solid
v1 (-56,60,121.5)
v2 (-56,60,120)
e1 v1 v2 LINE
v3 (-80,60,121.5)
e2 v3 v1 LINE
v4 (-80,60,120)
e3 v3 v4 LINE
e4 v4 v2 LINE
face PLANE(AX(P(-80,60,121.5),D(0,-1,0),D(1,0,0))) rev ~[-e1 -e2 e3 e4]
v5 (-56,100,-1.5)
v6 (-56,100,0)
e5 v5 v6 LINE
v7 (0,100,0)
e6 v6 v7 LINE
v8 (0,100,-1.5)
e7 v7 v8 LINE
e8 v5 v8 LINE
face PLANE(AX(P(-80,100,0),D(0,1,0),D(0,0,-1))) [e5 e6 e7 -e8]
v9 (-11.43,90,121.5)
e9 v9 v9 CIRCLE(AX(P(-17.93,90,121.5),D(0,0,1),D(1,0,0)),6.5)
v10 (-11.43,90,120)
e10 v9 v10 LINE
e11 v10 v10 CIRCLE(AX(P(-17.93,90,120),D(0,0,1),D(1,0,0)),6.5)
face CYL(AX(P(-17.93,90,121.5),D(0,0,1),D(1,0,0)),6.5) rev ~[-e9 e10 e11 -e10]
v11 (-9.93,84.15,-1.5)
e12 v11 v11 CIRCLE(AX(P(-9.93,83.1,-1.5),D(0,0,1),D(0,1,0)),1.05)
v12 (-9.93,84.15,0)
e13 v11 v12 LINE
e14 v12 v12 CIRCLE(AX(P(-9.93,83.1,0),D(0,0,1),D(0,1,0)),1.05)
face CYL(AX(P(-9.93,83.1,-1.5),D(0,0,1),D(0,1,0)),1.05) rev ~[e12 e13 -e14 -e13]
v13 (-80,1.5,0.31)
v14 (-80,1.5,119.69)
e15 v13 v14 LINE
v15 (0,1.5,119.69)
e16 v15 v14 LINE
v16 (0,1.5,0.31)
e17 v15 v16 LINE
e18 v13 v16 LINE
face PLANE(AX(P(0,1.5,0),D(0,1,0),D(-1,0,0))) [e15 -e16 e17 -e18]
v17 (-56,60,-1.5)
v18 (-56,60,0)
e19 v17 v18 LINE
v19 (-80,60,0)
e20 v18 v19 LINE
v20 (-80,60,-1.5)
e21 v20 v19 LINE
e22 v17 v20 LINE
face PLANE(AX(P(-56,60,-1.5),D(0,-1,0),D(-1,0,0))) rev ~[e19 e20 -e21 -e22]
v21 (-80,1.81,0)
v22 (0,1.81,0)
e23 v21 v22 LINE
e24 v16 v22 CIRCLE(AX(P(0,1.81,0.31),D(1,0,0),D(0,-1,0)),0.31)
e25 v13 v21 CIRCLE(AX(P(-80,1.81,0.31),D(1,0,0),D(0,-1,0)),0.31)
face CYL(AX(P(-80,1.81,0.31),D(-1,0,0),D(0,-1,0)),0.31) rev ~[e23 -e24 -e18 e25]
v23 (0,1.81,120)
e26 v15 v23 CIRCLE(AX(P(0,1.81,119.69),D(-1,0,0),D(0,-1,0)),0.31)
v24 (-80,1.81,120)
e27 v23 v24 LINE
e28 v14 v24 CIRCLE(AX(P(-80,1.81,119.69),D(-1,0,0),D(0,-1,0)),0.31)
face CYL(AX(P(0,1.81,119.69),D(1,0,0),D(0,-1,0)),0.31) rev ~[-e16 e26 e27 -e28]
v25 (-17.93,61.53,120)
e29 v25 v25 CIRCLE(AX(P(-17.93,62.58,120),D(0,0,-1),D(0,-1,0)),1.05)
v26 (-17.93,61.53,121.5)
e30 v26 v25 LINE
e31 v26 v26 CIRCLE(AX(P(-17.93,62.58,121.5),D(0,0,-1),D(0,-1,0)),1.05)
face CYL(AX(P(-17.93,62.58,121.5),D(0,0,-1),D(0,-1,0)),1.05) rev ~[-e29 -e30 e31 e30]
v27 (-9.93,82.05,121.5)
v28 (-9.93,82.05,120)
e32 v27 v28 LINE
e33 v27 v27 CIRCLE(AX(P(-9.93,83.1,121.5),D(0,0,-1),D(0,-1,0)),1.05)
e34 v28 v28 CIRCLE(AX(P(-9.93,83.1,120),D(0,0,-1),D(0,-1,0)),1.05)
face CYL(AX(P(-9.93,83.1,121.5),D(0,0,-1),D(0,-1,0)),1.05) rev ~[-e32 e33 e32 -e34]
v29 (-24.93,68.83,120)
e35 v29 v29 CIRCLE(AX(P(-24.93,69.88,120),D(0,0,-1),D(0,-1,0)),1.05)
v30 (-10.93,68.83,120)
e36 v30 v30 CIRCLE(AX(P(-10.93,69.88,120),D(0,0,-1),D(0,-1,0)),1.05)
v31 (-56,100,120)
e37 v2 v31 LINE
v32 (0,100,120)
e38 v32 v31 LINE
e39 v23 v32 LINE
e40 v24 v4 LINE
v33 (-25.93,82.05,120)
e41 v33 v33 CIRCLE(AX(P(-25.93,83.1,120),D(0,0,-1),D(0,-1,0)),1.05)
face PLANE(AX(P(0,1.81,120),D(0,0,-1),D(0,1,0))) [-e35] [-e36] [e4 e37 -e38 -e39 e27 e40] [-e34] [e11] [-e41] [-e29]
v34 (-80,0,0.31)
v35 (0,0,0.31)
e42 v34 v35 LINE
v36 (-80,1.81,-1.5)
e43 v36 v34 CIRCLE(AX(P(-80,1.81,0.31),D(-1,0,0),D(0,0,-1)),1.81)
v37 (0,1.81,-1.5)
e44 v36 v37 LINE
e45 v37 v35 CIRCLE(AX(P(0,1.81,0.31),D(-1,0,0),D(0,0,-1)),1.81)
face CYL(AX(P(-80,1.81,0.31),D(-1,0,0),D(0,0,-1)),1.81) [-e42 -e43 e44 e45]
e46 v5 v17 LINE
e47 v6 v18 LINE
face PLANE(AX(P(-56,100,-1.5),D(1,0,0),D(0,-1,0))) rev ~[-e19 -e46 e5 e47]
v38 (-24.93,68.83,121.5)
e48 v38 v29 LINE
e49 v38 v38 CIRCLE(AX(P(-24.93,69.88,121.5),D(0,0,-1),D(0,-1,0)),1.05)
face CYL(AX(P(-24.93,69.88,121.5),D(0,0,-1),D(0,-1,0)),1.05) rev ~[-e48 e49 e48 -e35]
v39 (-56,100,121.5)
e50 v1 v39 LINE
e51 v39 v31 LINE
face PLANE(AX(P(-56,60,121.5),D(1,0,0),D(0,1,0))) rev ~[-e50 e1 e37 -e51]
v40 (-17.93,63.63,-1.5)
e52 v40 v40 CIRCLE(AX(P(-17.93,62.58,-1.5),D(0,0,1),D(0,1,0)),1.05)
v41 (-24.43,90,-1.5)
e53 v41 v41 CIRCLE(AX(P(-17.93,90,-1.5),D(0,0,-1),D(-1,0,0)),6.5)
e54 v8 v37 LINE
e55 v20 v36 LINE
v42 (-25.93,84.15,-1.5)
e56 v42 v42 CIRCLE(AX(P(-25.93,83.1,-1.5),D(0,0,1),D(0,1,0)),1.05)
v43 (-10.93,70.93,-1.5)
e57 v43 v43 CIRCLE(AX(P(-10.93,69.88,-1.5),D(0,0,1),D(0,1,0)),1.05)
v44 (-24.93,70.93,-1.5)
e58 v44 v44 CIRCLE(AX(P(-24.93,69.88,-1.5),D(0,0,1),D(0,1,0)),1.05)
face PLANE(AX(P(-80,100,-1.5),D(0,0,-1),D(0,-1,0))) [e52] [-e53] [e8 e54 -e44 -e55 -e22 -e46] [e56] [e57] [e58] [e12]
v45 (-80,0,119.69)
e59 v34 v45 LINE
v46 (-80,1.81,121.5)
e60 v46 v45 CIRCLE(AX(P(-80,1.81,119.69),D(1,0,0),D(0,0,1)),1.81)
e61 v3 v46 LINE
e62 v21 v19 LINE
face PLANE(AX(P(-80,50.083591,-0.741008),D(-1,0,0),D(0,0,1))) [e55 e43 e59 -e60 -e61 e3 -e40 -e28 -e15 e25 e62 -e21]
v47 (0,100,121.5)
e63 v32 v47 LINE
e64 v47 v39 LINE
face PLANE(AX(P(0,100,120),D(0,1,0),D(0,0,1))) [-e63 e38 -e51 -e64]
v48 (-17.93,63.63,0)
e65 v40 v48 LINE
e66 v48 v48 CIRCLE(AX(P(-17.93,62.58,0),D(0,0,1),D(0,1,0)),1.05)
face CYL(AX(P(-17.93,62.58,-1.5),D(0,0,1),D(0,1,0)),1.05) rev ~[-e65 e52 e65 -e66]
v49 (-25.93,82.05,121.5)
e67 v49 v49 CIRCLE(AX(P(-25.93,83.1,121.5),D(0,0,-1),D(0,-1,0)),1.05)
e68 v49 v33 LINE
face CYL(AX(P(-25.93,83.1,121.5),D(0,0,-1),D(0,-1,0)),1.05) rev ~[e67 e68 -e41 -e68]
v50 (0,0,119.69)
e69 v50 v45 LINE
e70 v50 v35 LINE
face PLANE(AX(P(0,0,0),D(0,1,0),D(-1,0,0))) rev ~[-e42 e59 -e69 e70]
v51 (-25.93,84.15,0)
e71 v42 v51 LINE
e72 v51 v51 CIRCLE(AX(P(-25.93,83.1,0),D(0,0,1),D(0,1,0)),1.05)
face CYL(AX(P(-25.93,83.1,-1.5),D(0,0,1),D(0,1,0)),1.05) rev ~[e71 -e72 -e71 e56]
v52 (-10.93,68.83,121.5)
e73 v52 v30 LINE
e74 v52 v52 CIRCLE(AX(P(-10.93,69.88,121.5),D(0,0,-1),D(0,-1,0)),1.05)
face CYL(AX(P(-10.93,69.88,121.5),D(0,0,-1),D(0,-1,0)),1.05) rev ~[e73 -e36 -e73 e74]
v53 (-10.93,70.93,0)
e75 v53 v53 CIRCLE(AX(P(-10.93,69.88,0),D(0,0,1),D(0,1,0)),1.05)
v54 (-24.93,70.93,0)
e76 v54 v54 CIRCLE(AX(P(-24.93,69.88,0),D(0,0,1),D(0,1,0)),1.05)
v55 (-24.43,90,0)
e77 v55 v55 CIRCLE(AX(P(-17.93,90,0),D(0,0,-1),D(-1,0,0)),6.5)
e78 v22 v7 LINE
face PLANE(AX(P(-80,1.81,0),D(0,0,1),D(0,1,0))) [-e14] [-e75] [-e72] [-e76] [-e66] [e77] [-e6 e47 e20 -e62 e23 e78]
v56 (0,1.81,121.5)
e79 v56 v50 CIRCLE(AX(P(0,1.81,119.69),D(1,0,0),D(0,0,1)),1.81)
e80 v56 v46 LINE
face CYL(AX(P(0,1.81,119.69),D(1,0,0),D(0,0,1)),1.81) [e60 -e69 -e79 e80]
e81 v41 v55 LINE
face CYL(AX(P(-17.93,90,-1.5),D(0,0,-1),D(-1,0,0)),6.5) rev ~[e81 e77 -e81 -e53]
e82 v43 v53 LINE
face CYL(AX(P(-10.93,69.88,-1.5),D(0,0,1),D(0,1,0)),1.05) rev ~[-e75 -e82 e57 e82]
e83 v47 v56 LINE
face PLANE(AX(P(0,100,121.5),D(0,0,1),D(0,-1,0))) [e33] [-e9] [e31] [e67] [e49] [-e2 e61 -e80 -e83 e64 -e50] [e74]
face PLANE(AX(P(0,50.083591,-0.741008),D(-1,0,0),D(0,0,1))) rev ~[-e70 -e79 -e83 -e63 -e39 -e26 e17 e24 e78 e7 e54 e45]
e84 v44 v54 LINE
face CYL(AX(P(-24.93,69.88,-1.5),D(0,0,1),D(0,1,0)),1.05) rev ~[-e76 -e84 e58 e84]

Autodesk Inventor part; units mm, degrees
ref_plane "YZ Plane" through (0, 0, 0) normal (1, 0, 0) x (0, 1, 0)
ref_plane "XZ Plane" through (0, 0, 0) normal (0, 1, 0) x (-1, 0, 0)
ref_plane "XY Plane" through (0, 0, 0) normal (0, 0, 1) x (1, 0, 0)
sketch "Sketch1" plane through (0, 0, 0) normal (0, 1, 0) x (-1, 0, 0)
  line L0 (0, 0) -> (80, 0)
  line L1 (80, 0) -> (80, 120)
  line L2 (80, 120) -> (0, 120)
  line L3 (0, 120) -> (0, 0)
  dimension "d0" = 80
  dimension "d1" = 120
extrude "Plate1" add sketch "Sketch1" along normal blind 1.5
sketch "Sketch2" plane through (0, 0, 121.5) normal (0, 0, -1) x (-1, 0, 0)
  line L0 (80, 0) -> (0, 0)
  line L1 (0, 0) -> (0, 100)
  line L2 (0, 100) -> (80, 100)
  line L3 (80, 100) -> (80, 0)
edge flange "Flange1" height 100 angle 90 thickness 1.5 bend radius 0.31 thickness toward (0, 0, -1) relief tear relief width 1.5 relief depth 0.75 edges at (-40, 1.5, 120) wall of the first edge with corners at (-80, 0, 121.5) (0, 0, 121.5) (0, 100, 121.5) (-80, 100, 121.5)
bend "Bend1"
corner "Corner1"
sketch "Sketch3" plane through (-80, 0, -1.5) normal (0, 0, 1) x (1, 0, 0)
  line L0 (80, 0) -> (0, 0)
  line L1 (0, 0) -> (0, 100)
  line L2 (0, 100) -> (80, 100)
  line L3 (80, 100) -> (80, 0)
edge flange "Flange2" height 100 angle 90 thickness 1.5 bend radius 0.31 thickness toward (0, 0, 1) relief tear relief width 1.5 relief depth 0.75 edges at (-40, 1.5, 0) wall of the first edge with corners at (0, 0, -1.5) (-80, 0, -1.5) (-80, 100, -1.5) (0, 100, -1.5)
bend "Bend2"
corner "Corner2"
sketch "Sketch4" plane through (0, 100, -1.5) normal (0, 0, -1) x (-1, 0, 0)
  line L0 (56, -40) -> (80, -40)
  line L1 (80, -40) -> (80, 0)
  line L2 (80, 0) -> (56, 0)
  line L3 (56, 0) -> (56, -40)
  line L4 (80, 0) -> (80, -98.19) projected
  line L5 (0, 0) -> (80, 0) projected
  point P0 (0, -100)
  dimension "d23" = 24
  dimension "d24" = 40
extrude "Cut1" cut sketch "Sketch4" against normal blind 1.5
sketch "Sketch5" plane through (0, 100, 120) normal (0, 0, -1) x (-1, 0, 0)
  point P0 (0, -100)
sketch "Sketch6" plane through (-80, 100, 121.5) normal (0, 0, 1) x (1, 0, 0)
  line L0 (24, 0) -> (0, 0)
  line L1 (0, 0) -> (0, -40)
  line L2 (0, -40) -> (24, -40)
  line L3 (24, -40) -> (24, 0)
  line L4 (0, -98.19) -> (0, 0) projected
  line L5 (0, 0) -> (80, 0) projected
  point P0 (80, -100)
  dimension "d27" = 40
  dimension "d28" = 24
extrude "Cut2" cut sketch "Sketch6" against normal blind 1.5
sketch "Sketch7" plane through (0, 1.81, -1.5) normal (0, 0, -1) x (-1, 0, 0)
  circle A0 centre (17.93, 60.77) radius 0.7835 projected
  circle A1 centre (10.93, 68.07) radius 0.7835 projected
  circle A2 centre (24.93, 68.07) radius 0.7835 projected
  circle A3 centre (9.93, 81.29) radius 0.7835 projected
  circle A4 centre (25.93, 81.29) radius 0.7835 projected
  line L0 (24, 59.37) -> (11.86, 59.37) projected
  line L1 (24, 59.37) -> (24, 60.09) projected
  arc A5 (26, 62.09) -> (24, 60.09) centre (26, 60.09) ccw projected
  line L2 (26, 62.09) -> (26.72, 62.09) projected
  line L3 (26.72, 94.19) -> (26.72, 62.09) projected
  line L4 (26.72, 94.19) -> (26, 94.19) projected
  arc A6 (24, 96.19) -> (26, 94.19) centre (26, 96.19) ccw projected
  line L5 (24, 96.19) -> (24, 96.91) projected
  line L6 (11.86, 96.91) -> (24, 96.91) projected
  line L7 (11.86, 96.91) -> (11.86, 96.19) projected
  arc A7 (9.86, 94.19) -> (11.86, 96.19) centre (9.86, 96.19) ccw projected
  line L8 (9.86, 94.19) -> (9.14, 94.19) projected
  line L9 (9.14, 62.09) -> (9.14, 94.19) projected
  line L10 (9.14, 62.09) -> (9.86, 62.09) projected
  arc A8 (11.86, 60.09) -> (9.86, 62.09) centre (9.86, 60.09) ccw projected
  line L11 (11.86, 60.09) -> (11.86, 59.37) projected
  circle A9 centre (17.93, 88.19) radius 6.4 projected
  point P0 (0, -1.81)
  point P1 (11.86, 94.19)
hole "Hole1" at (-10.93, 69.88, -1.5) at (-9.93, 83.1, -1.5) at (-25.93, 83.1, -1.5) at (-24.93, 69.88, -1.5) at (-17.93, 62.58, -1.5) direction (0, 0, 1) diameter 2.1 depth 1.5
sketch "Sketch8" plane through (-80, 1.81, 121.5) normal (0, 0, 1) x (1, 0, 0)
  circle A0 centre (62.07, 60.77) radius 0.7835 projected
  circle A1 centre (55.07, 68.07) radius 0.7835 projected
  circle A2 centre (69.07, 68.07) radius 0.7835 projected
  circle A3 centre (54.07, 81.29) radius 0.7835 projected
  circle A4 centre (70.07, 81.29) radius 0.7835 projected
  line L0 (68.14, 59.37) -> (56, 59.37) projected
  line L1 (68.14, 59.37) -> (68.14, 60.09) projected
  arc A5 (70.14, 62.09) -> (68.14, 60.09) centre (70.14, 60.09) ccw projected
  line L2 (70.14, 62.09) -> (70.86, 62.09) projected
  line L3 (70.86, 94.19) -> (70.86, 62.09) projected
  line L4 (70.86, 94.19) -> (70.14, 94.19) projected
  arc A6 (68.14, 96.19) -> (70.14, 94.19) centre (70.14, 96.19) ccw projected
  line L5 (68.14, 96.19) -> (68.14, 96.91) projected
  line L6 (56, 96.91) -> (68.14, 96.91) projected
  line L7 (56, 96.91) -> (56, 96.19) projected
  arc A7 (54, 94.19) -> (56, 96.19) centre (54, 96.19) ccw projected
  line L8 (54, 94.19) -> (53.28, 94.19) projected
  line L9 (53.28, 62.09) -> (53.28, 94.19) projected
  line L10 (53.28, 62.09) -> (54, 62.09) projected
  arc A8 (56, 60.09) -> (54, 62.09) centre (54, 60.09) ccw projected
  line L11 (56, 60.09) -> (56, 59.37) projected
  circle A9 centre (62.07, 88.19) radius 6.4 projected
  point P0 (80, -1.81)
  point P1 (56, 94.19)
hole "Hole2" at (-25.93, 83.1, 121.5) at (-9.93, 83.1, 121.5) at (-10.93, 69.88, 121.5) at (-24.93, 69.88, 121.5) at (-17.93, 62.58, 121.5) direction (0, 0, -1) diameter 2.1 depth 1.5
sketch "Sketch9" plane through (-80, 1.81, 121.5) normal (0, 0, 1) x (1, 0, 0)
  circle A0 centre (62.07, 60.77) radius 0.7835 projected
  circle A1 centre (55.07, 68.07) radius 0.7835 projected
  circle A2 centre (69.07, 68.07) radius 0.7835 projected
  circle A3 centre (54.07, 81.29) radius 0.7835 projected
  circle A4 centre (70.07, 81.29) radius 0.7835 projected
  line L0 (68.14, 59.37) -> (56, 59.37) projected
  line L1 (68.14, 59.37) -> (68.14, 60.09) projected
  arc A5 (70.14, 62.09) -> (68.14, 60.09) centre (70.14, 60.09) ccw projected
  line L2 (70.14, 62.09) -> (70.86, 62.09) projected
  line L3 (70.86, 94.19) -> (70.86, 62.09) projected
  line L4 (70.86, 94.19) -> (70.14, 94.19) projected
  arc A6 (68.14, 96.19) -> (70.14, 94.19) centre (70.14, 96.19) ccw projected
  line L5 (68.14, 96.19) -> (68.14, 96.91) projected
  line L6 (56, 96.91) -> (68.14, 96.91) projected
  line L7 (56, 96.91) -> (56, 96.19) projected
  arc A7 (54, 94.19) -> (56, 96.19) centre (54, 96.19) ccw projected
  line L8 (54, 94.19) -> (53.28, 94.19) projected
  line L9 (53.28, 62.09) -> (53.28, 94.19) projected
  line L10 (53.28, 62.09) -> (54, 62.09) projected
  arc A8 (56, 60.09) -> (54, 62.09) centre (54, 60.09) ccw projected
  line L11 (56, 60.09) -> (56, 59.37) projected
  circle A9 centre (62.07, 88.19) radius 6.4 projected
  circle A10 centre (62.07, 88.19) radius 6.5
  point P0 (80, -1.81)
  point P1 (56, 94.19)
  dimension "d45" = 13
extrude "Extrusion1" cut sketch "Sketch9" against normal blind 1.5 contours A9 | A10
sketch "Sketch10" plane through (0, 1.81, -1.5) normal (0, 0, -1) x (-1, 0, 0)
  circle A0 centre (17.93, 60.77) radius 0.7835 projected
  circle A1 centre (10.93, 68.07) radius 0.7835 projected
  circle A2 centre (24.93, 68.07) radius 0.7835 projected
  circle A3 centre (9.93, 81.29) radius 0.7835 projected
  circle A4 centre (25.93, 81.29) radius 0.7835 projected
  line L0 (24, 59.37) -> (11.86, 59.37) projected
  line L1 (24, 59.37) -> (24, 60.09) projected
  arc A5 (26, 62.09) -> (24, 60.09) centre (26, 60.09) ccw projected
  line L2 (26, 62.09) -> (26.72, 62.09) projected
  line L3 (26.72, 94.19) -> (26.72, 62.09) projected
  line L4 (26.72, 94.19) -> (26, 94.19) projected
  arc A6 (24, 96.19) -> (26, 94.19) centre (26, 96.19) ccw projected
  line L5 (24, 96.19) -> (24, 96.91) projected
  line L6 (11.86, 96.91) -> (24, 96.91) projected
  line L7 (11.86, 96.91) -> (11.86, 96.19) projected
  arc A7 (9.86, 94.19) -> (11.86, 96.19) centre (9.86, 96.19) ccw projected
  line L8 (9.86, 94.19) -> (9.14, 94.19) projected
  line L9 (9.14, 62.09) -> (9.14, 94.19) projected
  line L10 (9.14, 62.09) -> (9.86, 62.09) projected
  arc A8 (11.86, 60.09) -> (9.86, 62.09) centre (9.86, 60.09) ccw projected
  line L11 (11.86, 60.09) -> (11.86, 59.37) projected
  circle A9 centre (17.93, 88.19) radius 6.4 projected
  circle A10 centre (17.93, 88.19) radius 6.5
  point P0 (0, -1.81)
  point P1 (11.86, 94.19)
  dimension "d48" = 13
extrude "Extrusion2" cut sketch "Sketch10" against normal blind 1.5 contours A9 | A10
equation "\"d25\" = Thickness"
equation "\"d29\" = Thickness"
equation "\"d36\" = Thickness"
equation "\"d43\" = Thickness"
equation "\"d2\" = Thickness"
equation "\"d3\" = BendReliefWidth"
equation "\"d4\" = BendReliefDepth"
equation "\"d5\" = MinimumRemnant"
equation "\"d6\" = TransitionRadius"
equation "\"d9\" = BendRadius"
equation "\"d10\" = CornerReliefSize"
equation "\"d11\" = GapSize"
equation "\"d12\" = JacobiRadiusSize"
equation "\"d13\" = BendReliefWidth"
equation "\"d14\" = BendReliefDepth"
equation "\"d15\" = MinimumRemnant"
equation "\"d16\" = TransitionRadius"
equation "\"d19\" = BendRadius"
equation "\"d20\" = CornerReliefSize"
equation "\"d21\" = GapSize"
equation "\"d22\" = JacobiRadiusSize"
equation "\"BendReliefWidth\" = Thickness"
equation "\"BendReliefDepth\" = 0.5 * Thickness"
equation "\"CornerReliefSize\" = 4 * Thickness"
equation "\"MinimumRemnant\" = 2 * Thickness"
equation "\"TransitionRadius\" = BendRadius"
equation "\"JacobiRadiusSize\" = BendRadius"
equation "\"GapSize\" = Thickness"
equation "\"Thickness\" = 1.5"
equation "\"BendRadius\" = 0.31"
properties part number "body_main_frame" material "Aluminum 6061-AHC"
